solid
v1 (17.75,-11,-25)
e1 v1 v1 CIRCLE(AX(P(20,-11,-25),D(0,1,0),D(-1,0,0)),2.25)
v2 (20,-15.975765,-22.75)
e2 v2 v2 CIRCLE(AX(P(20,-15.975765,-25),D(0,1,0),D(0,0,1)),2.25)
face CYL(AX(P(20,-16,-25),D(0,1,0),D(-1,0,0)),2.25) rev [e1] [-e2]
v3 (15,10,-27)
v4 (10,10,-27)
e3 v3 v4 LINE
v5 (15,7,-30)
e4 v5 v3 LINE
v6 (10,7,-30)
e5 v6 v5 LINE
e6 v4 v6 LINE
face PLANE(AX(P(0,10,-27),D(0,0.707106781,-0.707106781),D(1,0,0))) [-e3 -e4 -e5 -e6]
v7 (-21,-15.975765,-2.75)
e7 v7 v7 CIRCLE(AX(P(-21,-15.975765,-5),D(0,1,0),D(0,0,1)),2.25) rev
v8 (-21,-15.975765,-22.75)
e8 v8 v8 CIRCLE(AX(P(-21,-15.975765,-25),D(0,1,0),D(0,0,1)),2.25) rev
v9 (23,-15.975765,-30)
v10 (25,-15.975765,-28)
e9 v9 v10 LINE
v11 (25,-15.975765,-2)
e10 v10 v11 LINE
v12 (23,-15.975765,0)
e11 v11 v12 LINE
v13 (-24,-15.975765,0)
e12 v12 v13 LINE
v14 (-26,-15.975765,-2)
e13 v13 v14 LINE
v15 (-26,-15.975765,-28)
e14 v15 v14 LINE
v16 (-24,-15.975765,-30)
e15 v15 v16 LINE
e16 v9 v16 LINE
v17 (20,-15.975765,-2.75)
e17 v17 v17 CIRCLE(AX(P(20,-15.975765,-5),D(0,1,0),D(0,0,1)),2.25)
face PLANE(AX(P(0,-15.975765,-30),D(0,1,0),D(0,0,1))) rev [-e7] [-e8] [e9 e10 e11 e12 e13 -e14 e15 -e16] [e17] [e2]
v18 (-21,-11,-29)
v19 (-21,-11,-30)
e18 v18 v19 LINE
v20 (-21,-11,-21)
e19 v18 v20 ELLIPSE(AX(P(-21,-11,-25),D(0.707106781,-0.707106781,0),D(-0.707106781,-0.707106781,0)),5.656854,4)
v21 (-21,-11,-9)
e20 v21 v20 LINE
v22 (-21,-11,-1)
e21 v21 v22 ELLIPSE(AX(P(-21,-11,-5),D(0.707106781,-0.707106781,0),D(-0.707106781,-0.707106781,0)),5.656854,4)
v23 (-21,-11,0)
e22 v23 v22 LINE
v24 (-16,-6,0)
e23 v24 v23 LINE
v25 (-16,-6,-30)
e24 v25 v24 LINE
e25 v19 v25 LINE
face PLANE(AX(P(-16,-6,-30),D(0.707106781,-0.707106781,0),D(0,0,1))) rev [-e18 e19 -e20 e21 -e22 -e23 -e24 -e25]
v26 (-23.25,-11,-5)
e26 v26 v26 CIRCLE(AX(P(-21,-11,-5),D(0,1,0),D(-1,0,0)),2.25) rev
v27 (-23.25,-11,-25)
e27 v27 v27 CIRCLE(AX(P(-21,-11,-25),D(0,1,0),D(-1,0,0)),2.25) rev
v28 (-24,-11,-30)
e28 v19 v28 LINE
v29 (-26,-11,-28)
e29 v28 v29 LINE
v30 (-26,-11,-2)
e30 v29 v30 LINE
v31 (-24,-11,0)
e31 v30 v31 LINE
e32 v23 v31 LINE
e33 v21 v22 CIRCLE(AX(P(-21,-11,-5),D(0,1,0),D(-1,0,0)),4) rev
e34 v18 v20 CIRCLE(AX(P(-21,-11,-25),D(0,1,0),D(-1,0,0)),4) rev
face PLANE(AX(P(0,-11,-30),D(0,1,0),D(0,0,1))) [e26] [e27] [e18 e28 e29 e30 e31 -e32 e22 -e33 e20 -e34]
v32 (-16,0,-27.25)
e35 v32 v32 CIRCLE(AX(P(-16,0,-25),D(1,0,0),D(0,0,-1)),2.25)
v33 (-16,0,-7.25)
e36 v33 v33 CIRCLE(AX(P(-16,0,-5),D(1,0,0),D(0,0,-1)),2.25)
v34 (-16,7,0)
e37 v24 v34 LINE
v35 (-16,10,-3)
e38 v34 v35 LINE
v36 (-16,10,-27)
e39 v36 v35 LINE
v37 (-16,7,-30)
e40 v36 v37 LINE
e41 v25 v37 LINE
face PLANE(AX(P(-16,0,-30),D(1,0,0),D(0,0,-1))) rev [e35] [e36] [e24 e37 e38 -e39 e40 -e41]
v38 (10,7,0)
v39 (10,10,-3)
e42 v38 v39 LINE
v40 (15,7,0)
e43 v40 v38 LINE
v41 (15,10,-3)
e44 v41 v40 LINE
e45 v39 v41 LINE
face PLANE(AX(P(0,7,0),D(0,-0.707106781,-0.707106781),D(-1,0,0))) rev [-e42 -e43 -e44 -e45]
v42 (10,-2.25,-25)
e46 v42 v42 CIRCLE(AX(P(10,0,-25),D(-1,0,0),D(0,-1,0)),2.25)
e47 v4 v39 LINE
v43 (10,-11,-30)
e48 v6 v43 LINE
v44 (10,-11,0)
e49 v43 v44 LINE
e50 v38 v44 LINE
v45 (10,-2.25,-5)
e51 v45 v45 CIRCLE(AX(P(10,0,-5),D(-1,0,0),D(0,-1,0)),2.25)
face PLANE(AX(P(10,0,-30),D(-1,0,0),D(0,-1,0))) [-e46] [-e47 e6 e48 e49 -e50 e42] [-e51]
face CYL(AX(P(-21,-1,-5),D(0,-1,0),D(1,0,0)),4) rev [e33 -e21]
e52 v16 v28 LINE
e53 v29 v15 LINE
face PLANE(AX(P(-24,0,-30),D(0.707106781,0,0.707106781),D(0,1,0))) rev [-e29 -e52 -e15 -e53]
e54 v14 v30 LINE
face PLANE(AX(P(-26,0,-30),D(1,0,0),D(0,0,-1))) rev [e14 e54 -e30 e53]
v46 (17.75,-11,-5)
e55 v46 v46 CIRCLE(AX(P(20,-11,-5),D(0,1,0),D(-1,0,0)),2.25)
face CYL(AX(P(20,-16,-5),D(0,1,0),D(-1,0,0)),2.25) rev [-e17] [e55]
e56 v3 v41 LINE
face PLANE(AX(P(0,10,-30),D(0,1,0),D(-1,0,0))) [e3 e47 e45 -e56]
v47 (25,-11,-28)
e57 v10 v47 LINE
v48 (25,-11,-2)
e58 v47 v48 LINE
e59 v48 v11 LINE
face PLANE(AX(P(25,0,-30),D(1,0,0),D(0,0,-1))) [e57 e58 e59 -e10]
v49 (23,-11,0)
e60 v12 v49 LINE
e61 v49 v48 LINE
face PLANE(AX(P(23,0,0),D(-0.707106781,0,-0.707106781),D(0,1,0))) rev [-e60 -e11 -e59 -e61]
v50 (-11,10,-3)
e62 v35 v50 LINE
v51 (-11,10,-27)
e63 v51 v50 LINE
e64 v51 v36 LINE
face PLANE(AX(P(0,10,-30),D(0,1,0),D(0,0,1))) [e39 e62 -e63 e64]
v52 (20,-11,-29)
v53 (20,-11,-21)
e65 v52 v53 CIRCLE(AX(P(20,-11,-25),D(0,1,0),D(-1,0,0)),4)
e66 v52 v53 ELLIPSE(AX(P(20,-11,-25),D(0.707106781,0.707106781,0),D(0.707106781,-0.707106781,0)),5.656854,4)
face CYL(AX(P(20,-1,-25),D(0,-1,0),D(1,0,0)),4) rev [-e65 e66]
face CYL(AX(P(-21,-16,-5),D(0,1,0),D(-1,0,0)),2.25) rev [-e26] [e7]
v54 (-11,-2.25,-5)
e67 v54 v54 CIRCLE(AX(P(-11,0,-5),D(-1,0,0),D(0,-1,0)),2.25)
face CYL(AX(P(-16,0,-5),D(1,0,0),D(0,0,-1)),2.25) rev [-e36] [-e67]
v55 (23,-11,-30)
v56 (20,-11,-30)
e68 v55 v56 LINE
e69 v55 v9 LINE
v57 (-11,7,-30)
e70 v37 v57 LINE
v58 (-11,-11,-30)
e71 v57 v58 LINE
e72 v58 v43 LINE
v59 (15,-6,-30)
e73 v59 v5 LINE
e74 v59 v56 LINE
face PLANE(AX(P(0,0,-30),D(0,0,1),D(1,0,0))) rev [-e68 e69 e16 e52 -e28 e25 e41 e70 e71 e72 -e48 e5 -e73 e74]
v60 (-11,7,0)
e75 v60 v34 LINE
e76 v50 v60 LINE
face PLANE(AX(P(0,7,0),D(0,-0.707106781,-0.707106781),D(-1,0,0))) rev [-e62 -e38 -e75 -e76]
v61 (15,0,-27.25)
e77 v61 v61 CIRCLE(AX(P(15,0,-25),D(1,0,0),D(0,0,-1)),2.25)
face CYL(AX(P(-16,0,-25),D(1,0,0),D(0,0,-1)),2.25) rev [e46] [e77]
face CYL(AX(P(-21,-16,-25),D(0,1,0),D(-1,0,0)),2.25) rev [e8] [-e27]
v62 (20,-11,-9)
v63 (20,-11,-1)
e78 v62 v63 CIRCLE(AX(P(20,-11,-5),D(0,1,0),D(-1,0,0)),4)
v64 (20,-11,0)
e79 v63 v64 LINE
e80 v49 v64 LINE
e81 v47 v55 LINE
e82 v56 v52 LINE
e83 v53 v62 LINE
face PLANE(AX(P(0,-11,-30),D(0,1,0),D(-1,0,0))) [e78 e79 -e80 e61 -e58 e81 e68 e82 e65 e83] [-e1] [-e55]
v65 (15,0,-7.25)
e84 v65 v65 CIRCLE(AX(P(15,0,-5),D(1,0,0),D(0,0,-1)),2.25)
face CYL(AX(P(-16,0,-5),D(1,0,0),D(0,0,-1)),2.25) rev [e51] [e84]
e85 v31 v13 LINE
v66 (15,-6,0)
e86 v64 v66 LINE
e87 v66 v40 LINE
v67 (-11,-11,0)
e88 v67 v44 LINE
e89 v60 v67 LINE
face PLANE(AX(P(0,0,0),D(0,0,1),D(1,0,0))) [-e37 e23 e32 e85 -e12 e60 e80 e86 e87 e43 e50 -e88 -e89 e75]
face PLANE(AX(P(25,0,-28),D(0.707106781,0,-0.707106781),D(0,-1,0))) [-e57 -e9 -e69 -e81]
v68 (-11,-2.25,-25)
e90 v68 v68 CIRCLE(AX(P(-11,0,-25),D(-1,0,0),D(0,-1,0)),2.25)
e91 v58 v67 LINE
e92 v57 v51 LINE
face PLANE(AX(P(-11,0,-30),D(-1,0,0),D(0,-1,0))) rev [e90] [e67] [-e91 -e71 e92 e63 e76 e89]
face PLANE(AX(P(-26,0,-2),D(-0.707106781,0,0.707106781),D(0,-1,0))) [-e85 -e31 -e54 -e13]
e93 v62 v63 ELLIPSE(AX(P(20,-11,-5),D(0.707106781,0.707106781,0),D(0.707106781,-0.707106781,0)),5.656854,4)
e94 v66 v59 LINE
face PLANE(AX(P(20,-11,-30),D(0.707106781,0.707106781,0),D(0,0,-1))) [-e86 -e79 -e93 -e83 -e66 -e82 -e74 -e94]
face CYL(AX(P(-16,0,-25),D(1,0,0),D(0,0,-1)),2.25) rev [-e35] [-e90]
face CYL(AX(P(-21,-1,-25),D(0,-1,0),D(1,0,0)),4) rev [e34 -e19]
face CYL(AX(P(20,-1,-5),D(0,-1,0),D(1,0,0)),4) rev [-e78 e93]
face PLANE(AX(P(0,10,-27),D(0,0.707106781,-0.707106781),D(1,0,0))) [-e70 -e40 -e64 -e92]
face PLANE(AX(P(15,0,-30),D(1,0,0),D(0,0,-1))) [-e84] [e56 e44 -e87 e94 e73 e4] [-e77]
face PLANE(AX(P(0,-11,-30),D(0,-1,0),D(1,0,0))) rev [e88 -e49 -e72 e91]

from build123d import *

# Parameters (mm, degrees)
BOSS_EXTRUDE1_DEPTH = 30
SKETCH15_R          = 2.25
CUT_EXTRUDE1_DEPTH  = 31
SKETCH14_R          = 2.25
CUT_EXTRUDE2_DEPTH  = 5
CHAMFER2_SIZE       = 3
CHAMFER3_SIZE       = 2
CHAMFER4_SIZE       = 5
SKETCH14_7_R        = 4
CUT_EXTRUDE3_DEPTH  = 10


with BuildPart() as part:
    # Sketch13 → Boss-Extrude1 (new body)
    with BuildSketch(Plane.XY):
        Polygon((-26, -15.975764912), (-26, -11), (-16, -11), (-16, 10), (-11, 10), (-11, -11), (10, -11), (10, 10), (15, 10), (15, -11), (25, -11), (25, -15.975764912), align=None)
    extrude(amount=-BOSS_EXTRUDE1_DEPTH)

    # Sketch15 → Cut-Extrude1 (cut)
    with BuildSketch(Plane(origin=(15, 0, 0), x_dir=(0, 0, -1), z_dir=(1, 0, 0))):
        with Locations((5, 0)):
            Circle(SKETCH15_R)
        with Locations((25, 0)):
            Circle(SKETCH15_R)
    extrude(amount=-CUT_EXTRUDE1_DEPTH, mode=Mode.SUBTRACT)

    # Sketch14 → Cut-Extrude2 (cut)
    with BuildSketch(Plane(origin=(0, -11, 0), x_dir=(1, 0, 0), z_dir=(0, 1, 0))):
        with Locations(Location((20, 25, 0), (0, 0, 180))):
            Circle(SKETCH14_R)
        with Locations(Location((20, 5, 0), (0, 0, 180))):
            Circle(SKETCH14_R)
        with Locations(Location((-21, 5, 0), (0, 0, 180))):
            Circle(SKETCH14_R)
        with Locations(Location((-21, 25, 0), (0, 0, 180))):
            Circle(SKETCH14_R)
    extrude(amount=-CUT_EXTRUDE2_DEPTH, mode=Mode.SUBTRACT)

    # Chamfer2
    chamfer2_edges = [part.edges().sort_by_distance(p)[0] for p in [
        (-13.5, 10, 0),
        (12.5, 10, 0),
        (12.5, 10, -30),
        (-13.5, 10, -30),
    ]]
    chamfer(chamfer2_edges, length=CHAMFER2_SIZE)

    # Chamfer3
    chamfer3_edges = [part.edges().sort_by_distance(p)[0] for p in [
        (25, -13.487882456, -30),
        (25, -13.487882456, 0),
        (-26, -13.487882456, 0),
        (-26, -13.487882456, -30),
    ]]
    chamfer(chamfer3_edges, length=CHAMFER3_SIZE)

    # Chamfer4
    # the kernel refuses this chamfer: 5 mm, written as the material it adds along each edge
    with BuildSketch(Plane(origin=(-16, -11, 0), x_dir=(-0.9996219169112968, -0.027495876610586317, 0), z_dir=(0, 0, -1))) as chamfer4_piece_1_section:
        Polygon((CHAMFER4_SIZE * 0.999621916911, CHAMFER4_SIZE * 0.0274958766106), (-CHAMFER4_SIZE * 0.0274958766106, CHAMFER4_SIZE * 0.999621916911), (0, 0), align=None)
    chamfer4_piece_1 = extrude(amount=30, mode=Mode.PRIVATE)
    chamfer4_piece_1 = chamfer4_piece_1 - Plane(origin=(-21, -9.300389261, -25), x_dir=(-1, 0, 0), z_dir=(0, 1, 0)) * Cylinder(2.25, 80, mode=Mode.PRIVATE)
    chamfer4_piece_1 = chamfer4_piece_1 - Plane(origin=(-21, -9.300389261, -5), x_dir=(-1, 0, 0), z_dir=(0, 1, 0)) * Cylinder(2.25, 80, mode=Mode.PRIVATE)
    add(chamfer4_piece_1)
    with BuildSketch(Plane(origin=(15, -11, 0), x_dir=(0.9996219169112968, -0.027495876610586337, 0), z_dir=(0, 0, -1))) as chamfer4_piece_2_section:
        Polygon((CHAMFER4_SIZE * 0.999621916911, -CHAMFER4_SIZE * 0.0274958766106), (-CHAMFER4_SIZE * 0.0274958766106, -CHAMFER4_SIZE * 0.999621916911), (0, 0), align=None)
    chamfer4_piece_2 = extrude(amount=30, mode=Mode.PRIVATE)
    chamfer4_piece_2 = chamfer4_piece_2 - Plane(origin=(20, -9.300389689, -25), x_dir=(-1, 0, 0), z_dir=(0, 1, 0)) * Cylinder(2.25, 80, mode=Mode.PRIVATE)
    chamfer4_piece_2 = chamfer4_piece_2 - Plane(origin=(20, -9.300389689, -5), x_dir=(-1, 0, 0), z_dir=(0, 1, 0)) * Cylinder(2.25, 80, mode=Mode.PRIVATE)
    add(chamfer4_piece_2)

    # Sketch14<7> → Cut-Extrude3 (cut)
    with BuildSketch(Plane(origin=(0, -11, 0), x_dir=(1, 0, 0), z_dir=(0, 1, 0))):
        with Locations((20, 25)):
            Circle(SKETCH14_7_R)
        with Locations((20, 5)):
            Circle(SKETCH14_7_R)
        with Locations((-21, 5)):
            Circle(SKETCH14_7_R)
        with Locations((-21, 25)):
            Circle(SKETCH14_7_R)
    extrude(amount=CUT_EXTRUDE3_DEPTH, mode=Mode.SUBTRACT)


solid = part.part
